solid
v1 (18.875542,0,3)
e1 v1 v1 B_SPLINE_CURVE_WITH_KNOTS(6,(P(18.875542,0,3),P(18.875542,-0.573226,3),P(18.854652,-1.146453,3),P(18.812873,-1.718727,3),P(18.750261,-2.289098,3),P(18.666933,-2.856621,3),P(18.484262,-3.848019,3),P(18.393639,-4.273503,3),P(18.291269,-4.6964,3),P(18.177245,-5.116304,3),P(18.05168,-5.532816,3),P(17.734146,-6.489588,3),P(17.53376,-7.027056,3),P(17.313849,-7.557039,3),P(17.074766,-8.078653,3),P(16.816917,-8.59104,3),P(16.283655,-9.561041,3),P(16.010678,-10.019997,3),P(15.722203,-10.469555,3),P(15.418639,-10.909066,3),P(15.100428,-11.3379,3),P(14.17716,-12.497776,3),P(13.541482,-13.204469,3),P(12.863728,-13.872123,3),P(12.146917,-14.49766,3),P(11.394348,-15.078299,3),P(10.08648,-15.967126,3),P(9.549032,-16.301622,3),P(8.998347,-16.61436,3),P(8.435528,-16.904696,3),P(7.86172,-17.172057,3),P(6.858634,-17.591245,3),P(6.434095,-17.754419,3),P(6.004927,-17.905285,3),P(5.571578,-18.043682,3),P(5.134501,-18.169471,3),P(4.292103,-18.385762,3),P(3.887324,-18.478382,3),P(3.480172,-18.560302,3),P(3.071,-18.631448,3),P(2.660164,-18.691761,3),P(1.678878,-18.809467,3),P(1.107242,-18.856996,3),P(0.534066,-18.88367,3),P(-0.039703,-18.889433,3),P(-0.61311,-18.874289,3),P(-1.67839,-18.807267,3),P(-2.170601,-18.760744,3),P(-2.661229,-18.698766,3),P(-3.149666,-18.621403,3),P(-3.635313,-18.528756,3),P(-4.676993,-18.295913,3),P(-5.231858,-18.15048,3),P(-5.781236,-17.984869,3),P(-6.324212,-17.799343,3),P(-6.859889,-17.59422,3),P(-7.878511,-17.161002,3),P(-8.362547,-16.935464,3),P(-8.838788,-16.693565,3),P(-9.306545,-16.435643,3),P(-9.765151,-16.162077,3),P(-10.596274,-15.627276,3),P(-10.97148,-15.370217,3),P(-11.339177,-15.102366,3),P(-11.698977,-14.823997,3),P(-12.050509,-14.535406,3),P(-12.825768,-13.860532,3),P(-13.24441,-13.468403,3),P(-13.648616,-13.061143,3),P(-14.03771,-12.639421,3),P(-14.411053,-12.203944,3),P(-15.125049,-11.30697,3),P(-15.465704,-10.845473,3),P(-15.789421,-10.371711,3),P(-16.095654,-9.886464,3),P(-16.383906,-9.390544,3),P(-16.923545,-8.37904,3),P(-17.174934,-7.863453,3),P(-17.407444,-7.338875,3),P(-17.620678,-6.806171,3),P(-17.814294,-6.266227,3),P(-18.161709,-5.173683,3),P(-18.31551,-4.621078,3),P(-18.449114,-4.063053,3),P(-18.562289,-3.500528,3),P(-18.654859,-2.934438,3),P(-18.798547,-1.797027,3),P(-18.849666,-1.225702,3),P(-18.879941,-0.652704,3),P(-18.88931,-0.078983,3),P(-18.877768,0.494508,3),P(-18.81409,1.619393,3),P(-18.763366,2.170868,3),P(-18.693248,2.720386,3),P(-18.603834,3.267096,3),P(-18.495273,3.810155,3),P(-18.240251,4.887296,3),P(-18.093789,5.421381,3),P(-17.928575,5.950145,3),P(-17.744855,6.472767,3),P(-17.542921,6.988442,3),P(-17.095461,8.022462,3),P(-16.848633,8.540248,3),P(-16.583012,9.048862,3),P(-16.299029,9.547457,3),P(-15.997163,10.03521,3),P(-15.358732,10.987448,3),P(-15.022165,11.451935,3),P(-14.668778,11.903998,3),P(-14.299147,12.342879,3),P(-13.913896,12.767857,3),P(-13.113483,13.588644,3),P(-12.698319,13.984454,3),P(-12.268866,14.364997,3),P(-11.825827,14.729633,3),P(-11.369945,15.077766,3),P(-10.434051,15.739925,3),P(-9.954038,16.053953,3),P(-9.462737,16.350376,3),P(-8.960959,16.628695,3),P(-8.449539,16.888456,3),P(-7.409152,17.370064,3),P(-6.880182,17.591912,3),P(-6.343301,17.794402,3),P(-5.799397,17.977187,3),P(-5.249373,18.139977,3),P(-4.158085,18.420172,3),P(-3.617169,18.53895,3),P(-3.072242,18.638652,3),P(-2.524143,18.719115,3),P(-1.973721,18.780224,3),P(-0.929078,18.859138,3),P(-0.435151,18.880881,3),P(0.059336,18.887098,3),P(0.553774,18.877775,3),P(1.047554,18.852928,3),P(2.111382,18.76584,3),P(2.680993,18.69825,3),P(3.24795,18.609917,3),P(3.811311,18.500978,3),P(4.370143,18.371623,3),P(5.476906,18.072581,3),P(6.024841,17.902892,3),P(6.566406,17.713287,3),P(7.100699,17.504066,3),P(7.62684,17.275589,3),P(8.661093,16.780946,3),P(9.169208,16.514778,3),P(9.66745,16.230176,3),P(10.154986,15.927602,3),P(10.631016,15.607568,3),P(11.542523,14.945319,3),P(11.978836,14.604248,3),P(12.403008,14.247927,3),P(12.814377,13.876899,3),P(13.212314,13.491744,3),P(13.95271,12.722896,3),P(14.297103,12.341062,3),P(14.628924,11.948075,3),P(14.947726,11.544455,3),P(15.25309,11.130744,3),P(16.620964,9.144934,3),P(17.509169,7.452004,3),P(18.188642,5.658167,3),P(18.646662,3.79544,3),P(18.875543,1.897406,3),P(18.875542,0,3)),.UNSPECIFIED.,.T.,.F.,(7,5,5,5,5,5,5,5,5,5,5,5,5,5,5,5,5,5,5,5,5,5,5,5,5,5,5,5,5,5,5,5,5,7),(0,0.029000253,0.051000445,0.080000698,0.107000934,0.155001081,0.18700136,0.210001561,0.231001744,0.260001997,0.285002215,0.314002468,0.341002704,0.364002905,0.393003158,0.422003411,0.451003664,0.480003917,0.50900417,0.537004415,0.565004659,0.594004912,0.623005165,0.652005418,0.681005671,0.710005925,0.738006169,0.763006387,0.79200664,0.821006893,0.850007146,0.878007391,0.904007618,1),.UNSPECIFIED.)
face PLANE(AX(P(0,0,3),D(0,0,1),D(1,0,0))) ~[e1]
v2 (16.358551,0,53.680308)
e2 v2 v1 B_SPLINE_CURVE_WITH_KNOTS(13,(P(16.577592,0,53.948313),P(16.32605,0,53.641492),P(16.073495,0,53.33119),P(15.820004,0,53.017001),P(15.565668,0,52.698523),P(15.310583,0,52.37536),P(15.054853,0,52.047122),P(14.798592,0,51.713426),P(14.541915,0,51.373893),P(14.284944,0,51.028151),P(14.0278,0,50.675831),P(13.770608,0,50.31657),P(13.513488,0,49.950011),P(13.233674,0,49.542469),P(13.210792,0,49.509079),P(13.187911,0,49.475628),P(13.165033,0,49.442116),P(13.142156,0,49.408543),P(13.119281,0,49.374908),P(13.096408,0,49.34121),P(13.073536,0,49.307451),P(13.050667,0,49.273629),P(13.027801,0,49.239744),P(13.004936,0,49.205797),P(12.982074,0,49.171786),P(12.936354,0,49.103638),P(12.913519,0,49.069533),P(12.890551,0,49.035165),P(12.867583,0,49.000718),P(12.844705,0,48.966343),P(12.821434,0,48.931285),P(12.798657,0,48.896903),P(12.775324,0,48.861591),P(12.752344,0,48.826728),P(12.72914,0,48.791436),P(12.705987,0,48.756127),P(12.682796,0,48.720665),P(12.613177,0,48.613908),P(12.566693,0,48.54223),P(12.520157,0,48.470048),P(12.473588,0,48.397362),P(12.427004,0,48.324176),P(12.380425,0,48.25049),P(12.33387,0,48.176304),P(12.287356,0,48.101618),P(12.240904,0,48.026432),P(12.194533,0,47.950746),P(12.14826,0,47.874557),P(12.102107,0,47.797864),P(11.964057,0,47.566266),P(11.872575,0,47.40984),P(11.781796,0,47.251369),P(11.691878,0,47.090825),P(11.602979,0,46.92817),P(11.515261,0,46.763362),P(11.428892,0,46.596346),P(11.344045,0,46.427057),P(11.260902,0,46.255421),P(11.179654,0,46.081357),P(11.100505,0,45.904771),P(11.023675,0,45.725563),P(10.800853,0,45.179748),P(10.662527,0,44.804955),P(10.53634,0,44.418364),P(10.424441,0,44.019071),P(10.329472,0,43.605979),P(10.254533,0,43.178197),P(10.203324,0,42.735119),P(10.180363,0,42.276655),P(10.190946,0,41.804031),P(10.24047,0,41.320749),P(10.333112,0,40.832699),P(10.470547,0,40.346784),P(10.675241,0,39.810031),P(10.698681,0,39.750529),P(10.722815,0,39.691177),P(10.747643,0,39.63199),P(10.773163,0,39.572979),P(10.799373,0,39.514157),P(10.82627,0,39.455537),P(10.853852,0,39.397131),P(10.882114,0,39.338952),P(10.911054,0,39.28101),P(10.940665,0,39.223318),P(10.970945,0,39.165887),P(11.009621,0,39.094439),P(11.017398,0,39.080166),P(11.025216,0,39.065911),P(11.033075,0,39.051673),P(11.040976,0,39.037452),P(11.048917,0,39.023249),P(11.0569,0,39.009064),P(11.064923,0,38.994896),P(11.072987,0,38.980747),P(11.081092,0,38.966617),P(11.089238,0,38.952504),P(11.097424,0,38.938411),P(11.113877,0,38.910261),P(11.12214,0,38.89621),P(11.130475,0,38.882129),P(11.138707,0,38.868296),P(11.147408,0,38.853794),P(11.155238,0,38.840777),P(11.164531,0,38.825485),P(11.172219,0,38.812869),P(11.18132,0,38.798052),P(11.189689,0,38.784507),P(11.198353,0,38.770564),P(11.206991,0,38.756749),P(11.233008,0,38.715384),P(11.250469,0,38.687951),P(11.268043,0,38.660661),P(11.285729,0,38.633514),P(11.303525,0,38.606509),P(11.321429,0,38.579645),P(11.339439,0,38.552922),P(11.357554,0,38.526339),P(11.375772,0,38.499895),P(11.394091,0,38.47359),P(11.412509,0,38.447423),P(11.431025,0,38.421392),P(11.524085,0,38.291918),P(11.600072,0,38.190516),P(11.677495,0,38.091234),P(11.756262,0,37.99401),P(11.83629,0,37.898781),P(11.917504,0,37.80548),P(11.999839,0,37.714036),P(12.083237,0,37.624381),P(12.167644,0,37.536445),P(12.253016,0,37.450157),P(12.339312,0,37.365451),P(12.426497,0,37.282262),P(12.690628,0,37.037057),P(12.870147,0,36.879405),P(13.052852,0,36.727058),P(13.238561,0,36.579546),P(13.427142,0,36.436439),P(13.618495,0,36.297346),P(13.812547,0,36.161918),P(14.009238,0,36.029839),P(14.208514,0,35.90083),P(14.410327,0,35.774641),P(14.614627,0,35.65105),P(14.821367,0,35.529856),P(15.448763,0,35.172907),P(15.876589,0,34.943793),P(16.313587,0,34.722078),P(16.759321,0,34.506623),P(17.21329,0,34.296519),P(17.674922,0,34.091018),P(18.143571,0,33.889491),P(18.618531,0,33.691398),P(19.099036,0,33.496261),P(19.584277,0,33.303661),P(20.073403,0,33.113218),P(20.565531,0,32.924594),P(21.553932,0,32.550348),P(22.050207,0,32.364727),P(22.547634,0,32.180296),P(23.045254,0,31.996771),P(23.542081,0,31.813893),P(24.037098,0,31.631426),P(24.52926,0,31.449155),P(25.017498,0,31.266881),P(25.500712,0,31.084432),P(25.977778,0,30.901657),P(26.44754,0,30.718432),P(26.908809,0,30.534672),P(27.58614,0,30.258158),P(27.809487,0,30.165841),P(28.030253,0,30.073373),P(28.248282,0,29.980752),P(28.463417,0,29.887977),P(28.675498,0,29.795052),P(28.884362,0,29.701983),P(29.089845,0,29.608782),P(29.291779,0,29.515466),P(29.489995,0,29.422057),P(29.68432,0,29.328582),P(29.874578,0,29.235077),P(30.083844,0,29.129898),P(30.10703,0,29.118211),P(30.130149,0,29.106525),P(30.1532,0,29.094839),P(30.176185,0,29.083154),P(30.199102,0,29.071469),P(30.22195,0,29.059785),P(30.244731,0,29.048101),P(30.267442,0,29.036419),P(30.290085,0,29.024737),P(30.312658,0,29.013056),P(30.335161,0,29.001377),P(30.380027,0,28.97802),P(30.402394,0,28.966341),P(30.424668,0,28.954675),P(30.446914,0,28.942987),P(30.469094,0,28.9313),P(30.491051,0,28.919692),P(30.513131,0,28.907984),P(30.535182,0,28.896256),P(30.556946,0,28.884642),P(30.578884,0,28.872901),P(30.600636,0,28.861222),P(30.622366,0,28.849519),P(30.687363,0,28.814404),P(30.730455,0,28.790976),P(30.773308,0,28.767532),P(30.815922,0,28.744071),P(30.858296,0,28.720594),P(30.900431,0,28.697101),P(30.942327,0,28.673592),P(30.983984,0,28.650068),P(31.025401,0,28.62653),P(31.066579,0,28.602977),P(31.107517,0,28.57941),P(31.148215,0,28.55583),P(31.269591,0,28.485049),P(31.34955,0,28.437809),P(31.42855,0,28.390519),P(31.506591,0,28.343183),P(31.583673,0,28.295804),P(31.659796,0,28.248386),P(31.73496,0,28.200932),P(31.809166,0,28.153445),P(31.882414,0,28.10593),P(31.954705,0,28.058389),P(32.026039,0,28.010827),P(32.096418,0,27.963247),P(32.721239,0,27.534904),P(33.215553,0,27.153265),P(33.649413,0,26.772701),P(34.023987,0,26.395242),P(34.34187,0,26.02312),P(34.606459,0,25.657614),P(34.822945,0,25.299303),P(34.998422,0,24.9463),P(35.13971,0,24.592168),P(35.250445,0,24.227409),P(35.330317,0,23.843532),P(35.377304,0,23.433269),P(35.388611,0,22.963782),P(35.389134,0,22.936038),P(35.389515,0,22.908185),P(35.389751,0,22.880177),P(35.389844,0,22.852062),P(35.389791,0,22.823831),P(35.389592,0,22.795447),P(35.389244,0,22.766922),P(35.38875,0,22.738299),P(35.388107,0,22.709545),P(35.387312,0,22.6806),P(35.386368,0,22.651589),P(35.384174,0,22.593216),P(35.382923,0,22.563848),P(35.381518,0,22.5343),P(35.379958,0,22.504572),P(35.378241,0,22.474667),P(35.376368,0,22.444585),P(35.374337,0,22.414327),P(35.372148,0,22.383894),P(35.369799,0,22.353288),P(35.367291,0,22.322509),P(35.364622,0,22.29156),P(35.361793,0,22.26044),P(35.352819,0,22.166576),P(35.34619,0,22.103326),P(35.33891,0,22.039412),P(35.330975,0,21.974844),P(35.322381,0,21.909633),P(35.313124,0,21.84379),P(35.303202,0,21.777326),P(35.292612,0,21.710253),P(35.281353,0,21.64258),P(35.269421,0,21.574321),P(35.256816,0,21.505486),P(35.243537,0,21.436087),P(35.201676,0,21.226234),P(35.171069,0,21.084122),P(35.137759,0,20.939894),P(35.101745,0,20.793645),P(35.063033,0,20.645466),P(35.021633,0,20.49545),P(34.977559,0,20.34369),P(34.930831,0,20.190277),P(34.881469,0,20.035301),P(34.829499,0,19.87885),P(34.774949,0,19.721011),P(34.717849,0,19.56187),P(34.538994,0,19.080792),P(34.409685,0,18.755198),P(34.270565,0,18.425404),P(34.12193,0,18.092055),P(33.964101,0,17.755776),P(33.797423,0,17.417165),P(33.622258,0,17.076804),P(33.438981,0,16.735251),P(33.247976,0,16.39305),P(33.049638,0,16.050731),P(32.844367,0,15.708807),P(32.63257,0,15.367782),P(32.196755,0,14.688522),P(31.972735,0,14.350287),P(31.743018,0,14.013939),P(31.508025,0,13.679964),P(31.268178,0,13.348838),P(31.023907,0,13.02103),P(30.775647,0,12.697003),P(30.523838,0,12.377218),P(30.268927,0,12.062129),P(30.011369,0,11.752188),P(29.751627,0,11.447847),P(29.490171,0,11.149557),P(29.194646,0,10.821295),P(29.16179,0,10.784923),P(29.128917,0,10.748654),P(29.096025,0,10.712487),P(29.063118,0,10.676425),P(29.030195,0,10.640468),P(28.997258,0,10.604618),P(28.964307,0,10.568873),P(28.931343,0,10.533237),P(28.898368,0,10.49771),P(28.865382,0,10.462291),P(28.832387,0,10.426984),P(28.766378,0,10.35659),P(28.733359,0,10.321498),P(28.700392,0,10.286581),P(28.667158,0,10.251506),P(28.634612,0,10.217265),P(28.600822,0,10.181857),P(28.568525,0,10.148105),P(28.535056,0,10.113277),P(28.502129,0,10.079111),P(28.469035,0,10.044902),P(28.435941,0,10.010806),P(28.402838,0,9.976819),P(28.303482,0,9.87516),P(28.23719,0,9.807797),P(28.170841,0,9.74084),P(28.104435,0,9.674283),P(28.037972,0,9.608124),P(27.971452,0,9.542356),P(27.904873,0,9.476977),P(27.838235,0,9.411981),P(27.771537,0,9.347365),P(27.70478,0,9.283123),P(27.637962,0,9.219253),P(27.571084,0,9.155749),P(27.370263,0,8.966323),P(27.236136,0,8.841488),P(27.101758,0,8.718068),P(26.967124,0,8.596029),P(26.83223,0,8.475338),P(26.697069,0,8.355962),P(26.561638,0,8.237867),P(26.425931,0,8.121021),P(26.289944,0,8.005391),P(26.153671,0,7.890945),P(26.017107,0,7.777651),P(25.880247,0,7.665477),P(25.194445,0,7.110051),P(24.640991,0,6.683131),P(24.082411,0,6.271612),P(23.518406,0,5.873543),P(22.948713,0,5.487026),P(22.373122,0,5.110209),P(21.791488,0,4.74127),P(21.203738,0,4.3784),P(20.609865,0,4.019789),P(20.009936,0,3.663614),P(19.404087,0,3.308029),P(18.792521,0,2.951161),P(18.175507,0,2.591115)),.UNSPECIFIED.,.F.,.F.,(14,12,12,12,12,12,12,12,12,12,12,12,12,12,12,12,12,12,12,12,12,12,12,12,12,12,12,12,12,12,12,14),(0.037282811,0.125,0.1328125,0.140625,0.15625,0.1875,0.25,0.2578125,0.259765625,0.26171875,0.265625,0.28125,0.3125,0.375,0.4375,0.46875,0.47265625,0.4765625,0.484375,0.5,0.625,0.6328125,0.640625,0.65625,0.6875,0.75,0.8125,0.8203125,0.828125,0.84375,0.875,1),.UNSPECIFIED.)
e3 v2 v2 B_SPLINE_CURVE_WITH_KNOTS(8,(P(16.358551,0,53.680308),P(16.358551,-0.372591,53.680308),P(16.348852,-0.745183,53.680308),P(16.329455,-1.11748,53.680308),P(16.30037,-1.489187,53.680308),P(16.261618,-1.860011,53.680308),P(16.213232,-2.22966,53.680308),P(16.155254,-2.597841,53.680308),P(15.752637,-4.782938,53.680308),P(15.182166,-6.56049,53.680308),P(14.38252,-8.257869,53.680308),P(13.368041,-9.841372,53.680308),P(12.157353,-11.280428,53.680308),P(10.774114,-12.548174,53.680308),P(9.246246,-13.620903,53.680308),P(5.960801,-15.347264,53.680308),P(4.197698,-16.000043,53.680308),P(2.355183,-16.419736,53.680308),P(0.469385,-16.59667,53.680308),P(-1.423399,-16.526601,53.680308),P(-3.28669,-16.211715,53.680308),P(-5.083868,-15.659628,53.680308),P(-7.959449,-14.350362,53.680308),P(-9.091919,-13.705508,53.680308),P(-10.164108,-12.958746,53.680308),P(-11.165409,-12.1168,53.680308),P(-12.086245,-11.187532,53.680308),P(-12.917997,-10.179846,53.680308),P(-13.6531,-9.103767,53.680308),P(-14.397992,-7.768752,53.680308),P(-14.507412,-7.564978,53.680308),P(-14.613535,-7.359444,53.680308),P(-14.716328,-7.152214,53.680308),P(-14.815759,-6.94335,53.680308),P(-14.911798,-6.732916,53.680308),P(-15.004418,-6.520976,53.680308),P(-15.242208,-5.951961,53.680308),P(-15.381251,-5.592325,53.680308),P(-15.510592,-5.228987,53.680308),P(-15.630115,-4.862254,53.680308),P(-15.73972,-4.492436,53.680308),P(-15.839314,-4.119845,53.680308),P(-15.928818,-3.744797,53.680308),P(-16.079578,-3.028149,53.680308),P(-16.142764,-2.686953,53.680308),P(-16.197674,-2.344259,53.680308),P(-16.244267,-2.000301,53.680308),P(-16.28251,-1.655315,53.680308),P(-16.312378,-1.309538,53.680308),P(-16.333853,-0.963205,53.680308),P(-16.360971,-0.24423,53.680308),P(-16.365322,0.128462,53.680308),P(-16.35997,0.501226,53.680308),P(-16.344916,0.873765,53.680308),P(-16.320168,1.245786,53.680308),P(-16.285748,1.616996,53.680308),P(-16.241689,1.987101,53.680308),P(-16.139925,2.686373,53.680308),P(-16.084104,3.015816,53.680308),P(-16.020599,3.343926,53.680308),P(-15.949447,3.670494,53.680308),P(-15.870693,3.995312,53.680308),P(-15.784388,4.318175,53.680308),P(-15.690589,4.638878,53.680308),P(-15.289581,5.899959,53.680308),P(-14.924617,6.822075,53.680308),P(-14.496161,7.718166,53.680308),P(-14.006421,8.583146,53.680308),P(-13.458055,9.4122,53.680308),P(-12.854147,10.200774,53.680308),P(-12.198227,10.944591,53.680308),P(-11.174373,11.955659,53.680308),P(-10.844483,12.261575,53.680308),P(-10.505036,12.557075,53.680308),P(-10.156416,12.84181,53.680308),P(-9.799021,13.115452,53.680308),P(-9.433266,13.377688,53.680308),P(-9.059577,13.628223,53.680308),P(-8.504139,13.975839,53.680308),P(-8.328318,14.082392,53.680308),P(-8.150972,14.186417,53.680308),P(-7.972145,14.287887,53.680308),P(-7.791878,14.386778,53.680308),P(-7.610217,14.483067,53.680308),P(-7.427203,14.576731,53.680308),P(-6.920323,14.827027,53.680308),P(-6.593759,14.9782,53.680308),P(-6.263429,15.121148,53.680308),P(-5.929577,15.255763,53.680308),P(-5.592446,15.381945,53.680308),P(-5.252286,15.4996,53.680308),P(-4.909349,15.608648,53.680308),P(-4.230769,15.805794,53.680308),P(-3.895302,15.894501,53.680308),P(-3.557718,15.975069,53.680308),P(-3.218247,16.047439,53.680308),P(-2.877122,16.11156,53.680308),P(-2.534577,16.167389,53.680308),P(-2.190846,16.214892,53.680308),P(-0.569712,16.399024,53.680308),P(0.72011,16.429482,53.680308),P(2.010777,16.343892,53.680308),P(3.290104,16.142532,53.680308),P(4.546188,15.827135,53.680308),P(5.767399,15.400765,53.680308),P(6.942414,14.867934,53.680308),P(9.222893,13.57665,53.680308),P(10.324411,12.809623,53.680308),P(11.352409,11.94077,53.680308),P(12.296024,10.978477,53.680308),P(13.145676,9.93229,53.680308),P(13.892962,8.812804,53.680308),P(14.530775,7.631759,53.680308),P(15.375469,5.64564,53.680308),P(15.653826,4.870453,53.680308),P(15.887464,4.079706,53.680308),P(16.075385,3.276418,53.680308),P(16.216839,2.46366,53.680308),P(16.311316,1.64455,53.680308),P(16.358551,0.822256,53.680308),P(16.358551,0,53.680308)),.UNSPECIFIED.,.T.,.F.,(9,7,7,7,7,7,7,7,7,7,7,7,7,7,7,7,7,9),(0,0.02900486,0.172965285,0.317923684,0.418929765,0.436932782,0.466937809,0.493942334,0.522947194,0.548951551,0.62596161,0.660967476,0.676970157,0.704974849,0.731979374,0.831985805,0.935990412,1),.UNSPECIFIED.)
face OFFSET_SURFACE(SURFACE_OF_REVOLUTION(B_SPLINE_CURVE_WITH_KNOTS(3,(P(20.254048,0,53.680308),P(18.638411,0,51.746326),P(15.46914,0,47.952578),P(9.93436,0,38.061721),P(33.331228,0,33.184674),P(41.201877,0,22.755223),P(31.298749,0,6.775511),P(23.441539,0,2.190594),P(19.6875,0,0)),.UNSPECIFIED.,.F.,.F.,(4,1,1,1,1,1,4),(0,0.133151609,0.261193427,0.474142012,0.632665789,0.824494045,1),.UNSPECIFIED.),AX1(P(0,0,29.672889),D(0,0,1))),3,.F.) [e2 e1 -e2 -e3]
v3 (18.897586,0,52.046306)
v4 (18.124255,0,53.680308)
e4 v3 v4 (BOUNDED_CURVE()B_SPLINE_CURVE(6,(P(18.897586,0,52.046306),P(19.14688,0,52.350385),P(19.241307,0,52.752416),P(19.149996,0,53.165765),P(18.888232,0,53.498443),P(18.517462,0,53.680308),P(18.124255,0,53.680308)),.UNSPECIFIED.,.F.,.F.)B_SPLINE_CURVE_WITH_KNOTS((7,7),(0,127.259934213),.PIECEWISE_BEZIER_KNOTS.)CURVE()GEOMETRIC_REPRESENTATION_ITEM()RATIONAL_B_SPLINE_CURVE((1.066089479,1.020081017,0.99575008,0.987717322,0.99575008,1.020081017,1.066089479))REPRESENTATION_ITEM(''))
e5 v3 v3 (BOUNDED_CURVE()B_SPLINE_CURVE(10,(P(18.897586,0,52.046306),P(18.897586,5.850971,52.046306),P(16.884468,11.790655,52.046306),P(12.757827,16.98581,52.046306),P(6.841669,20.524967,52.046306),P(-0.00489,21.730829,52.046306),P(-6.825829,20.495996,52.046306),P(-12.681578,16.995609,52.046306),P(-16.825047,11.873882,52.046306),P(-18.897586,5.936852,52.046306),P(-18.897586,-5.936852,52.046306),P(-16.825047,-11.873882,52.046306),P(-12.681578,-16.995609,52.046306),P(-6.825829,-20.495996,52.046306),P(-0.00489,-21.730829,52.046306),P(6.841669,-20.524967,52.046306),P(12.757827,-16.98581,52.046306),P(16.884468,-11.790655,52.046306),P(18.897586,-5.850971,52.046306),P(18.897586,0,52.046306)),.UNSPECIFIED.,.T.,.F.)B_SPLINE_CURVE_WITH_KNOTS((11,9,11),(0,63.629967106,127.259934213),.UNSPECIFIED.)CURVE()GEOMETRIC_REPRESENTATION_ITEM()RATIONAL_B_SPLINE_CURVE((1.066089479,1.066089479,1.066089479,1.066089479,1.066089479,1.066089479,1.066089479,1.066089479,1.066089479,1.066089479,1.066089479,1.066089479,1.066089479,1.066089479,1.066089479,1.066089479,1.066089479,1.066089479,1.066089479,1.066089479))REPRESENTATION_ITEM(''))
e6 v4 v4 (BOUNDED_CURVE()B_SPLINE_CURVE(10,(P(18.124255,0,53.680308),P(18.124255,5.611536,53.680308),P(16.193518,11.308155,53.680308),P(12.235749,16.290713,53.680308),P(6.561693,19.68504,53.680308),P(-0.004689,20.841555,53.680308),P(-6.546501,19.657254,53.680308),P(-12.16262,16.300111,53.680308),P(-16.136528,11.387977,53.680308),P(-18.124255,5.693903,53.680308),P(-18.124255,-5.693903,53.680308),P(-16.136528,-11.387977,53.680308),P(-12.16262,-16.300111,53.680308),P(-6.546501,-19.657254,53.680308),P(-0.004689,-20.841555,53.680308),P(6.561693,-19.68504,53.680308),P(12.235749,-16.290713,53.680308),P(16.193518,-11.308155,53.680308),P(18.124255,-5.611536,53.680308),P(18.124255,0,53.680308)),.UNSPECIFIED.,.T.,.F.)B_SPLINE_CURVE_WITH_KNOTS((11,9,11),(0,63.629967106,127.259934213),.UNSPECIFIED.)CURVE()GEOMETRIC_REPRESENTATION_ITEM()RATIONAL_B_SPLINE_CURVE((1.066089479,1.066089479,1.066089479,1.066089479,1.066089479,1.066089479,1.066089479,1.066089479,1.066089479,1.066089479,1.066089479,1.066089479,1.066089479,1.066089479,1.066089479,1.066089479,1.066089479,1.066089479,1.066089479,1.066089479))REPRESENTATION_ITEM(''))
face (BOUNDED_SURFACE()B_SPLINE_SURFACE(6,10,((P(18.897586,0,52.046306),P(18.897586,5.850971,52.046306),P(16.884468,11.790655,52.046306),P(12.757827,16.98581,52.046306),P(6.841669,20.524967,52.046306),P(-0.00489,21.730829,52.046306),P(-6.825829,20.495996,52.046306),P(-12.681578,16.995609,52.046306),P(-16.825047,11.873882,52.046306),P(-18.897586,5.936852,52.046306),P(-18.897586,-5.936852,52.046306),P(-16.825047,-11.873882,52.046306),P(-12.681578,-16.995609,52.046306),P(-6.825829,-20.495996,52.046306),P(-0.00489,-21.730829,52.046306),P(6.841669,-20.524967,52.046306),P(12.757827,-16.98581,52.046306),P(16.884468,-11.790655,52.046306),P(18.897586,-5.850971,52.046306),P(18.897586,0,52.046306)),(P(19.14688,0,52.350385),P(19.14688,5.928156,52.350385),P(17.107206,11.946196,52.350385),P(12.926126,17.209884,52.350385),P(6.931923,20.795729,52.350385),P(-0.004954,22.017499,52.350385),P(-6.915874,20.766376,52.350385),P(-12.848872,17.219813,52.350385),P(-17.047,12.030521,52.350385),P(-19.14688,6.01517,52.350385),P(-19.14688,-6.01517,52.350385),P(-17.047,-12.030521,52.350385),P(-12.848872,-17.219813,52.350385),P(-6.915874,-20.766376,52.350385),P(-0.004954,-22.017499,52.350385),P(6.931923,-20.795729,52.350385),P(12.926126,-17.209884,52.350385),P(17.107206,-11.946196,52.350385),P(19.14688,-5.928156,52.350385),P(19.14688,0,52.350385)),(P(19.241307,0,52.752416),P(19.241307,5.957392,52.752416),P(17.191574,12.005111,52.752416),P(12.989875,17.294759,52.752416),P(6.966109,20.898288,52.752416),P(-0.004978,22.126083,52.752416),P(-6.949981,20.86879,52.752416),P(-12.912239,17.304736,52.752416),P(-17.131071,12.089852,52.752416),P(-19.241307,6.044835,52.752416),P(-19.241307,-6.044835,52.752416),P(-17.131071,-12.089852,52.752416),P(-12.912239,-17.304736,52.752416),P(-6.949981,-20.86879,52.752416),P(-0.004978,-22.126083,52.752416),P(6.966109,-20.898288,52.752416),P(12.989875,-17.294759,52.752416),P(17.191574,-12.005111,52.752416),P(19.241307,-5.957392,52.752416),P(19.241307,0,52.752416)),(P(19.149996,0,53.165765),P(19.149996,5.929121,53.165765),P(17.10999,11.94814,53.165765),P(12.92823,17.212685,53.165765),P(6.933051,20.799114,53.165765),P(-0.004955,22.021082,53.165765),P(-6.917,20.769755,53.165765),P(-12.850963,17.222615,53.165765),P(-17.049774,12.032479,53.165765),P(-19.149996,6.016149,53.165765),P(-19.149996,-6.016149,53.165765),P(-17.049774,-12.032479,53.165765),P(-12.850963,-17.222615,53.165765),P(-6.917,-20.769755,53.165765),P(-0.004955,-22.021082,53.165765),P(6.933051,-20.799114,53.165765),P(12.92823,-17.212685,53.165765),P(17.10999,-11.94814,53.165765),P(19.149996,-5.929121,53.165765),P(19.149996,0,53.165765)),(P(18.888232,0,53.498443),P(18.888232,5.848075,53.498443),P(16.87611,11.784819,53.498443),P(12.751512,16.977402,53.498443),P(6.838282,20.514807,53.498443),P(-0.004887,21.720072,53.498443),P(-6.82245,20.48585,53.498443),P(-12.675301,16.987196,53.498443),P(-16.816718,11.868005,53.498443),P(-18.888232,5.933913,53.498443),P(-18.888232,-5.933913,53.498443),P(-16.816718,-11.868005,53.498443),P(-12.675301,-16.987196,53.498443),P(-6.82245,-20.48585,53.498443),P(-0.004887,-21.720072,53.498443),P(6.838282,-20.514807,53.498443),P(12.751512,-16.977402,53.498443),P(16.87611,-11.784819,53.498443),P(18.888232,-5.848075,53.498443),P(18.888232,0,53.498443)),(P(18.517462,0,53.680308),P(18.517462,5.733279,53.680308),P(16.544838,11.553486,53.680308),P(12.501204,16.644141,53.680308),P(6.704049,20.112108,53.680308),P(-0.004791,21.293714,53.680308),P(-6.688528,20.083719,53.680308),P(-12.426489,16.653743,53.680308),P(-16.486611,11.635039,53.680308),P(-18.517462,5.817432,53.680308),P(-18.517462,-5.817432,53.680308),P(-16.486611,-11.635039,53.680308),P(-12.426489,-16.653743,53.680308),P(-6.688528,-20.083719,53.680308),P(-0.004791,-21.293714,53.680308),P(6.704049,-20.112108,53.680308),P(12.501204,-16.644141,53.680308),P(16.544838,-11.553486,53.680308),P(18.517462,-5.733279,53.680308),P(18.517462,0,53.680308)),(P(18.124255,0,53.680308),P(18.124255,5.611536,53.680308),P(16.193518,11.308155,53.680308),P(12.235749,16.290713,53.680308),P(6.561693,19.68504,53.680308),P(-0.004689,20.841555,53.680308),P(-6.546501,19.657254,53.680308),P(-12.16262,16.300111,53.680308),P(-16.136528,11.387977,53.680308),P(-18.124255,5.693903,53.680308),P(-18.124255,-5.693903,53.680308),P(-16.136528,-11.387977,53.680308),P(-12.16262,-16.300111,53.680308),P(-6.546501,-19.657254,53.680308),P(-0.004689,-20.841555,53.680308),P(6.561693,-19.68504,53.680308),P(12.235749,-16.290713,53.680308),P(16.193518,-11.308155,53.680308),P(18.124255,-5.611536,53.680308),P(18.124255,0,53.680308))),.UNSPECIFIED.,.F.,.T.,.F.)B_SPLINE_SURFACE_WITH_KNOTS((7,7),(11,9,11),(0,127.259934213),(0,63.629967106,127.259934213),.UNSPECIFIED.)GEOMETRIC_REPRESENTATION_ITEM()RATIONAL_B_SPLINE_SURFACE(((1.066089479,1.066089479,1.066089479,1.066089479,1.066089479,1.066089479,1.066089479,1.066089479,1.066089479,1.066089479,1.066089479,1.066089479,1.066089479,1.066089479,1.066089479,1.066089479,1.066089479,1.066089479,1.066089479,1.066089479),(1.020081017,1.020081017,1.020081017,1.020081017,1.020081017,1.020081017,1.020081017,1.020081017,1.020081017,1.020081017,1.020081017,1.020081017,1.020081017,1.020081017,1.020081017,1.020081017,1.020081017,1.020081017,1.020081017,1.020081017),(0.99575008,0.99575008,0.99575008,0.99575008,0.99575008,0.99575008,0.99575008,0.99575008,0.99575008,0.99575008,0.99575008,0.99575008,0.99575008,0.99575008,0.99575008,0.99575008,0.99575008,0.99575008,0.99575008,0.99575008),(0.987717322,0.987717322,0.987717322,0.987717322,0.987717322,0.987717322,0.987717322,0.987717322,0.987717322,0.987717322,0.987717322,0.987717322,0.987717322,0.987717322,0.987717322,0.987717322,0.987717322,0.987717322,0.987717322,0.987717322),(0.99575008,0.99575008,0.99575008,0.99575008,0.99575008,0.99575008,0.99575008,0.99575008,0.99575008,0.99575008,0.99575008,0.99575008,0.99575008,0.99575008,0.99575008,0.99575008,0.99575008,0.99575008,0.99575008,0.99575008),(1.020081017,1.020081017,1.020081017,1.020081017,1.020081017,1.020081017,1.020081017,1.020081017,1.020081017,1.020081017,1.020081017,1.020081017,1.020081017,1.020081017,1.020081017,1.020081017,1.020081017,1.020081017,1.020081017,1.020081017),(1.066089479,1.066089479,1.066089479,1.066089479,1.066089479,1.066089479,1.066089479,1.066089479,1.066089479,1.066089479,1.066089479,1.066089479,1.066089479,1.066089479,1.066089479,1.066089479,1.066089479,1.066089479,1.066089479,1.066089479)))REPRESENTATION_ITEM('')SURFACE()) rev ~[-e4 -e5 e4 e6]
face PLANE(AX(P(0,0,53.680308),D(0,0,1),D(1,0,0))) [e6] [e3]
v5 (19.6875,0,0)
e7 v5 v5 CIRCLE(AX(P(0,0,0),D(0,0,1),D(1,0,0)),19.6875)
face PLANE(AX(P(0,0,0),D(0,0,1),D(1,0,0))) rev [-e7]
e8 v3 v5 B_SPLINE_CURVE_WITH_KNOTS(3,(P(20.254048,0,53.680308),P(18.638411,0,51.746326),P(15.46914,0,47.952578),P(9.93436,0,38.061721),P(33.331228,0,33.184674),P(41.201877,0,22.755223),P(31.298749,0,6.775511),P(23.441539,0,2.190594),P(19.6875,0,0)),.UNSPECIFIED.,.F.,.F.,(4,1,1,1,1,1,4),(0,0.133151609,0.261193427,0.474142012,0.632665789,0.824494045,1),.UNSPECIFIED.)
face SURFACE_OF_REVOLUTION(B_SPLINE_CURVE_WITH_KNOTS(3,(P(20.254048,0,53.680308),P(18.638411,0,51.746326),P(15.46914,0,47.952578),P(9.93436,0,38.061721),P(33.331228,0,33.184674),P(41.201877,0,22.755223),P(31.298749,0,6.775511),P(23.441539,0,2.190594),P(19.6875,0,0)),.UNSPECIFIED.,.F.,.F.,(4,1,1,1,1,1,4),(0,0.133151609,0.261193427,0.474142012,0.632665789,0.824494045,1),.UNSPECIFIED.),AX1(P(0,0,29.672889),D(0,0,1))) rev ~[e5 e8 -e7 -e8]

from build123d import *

# Parameters (mm, degrees)
F2_R = 1
F3_T = 3


# Not quite as in the source:
# - a shell that OpenCascade refuses in one call is made with other operations: the cavity is built on its own and cut out


with BuildPart() as f1:
    # F0 (on Front) → F1 (revolve)
    with BuildSketch(Plane.XZ):
        with BuildLine():
            Line((0, 53.6803081632), (0, 0))
            Line((0, 0), (19.687499851, 0))
            add(Edge.make_bspline(
                [(20.2540475875, 53.6803081632), (18.6384112126, 51.7463255353), (15.4691397035, 47.9525782934), (9.9343595071, 38.0617206442), (33.3312284292, 33.1846739682), (41.201877378, 22.7552228995), (31.298748703, 6.7755111019), (23.4415391534, 2.19059425), (19.687499851, 0)],
                knots=[0, 0, 0, 0, 0.1331516095, 0.2611934274, 0.4741420117, 0.632665789, 0.824494045, 1, 1, 1, 1], degree=3))
            Line((20.2540475875, 53.6803081632), (0, 53.6803081632))
        make_face()
    revolve(axis=Axis((0, 0, 29.6728890389), (0, 0, 1)))

    # F2
    f2_edges = [f1.edges().sort_by_distance(p)[0] for p in [
        (-20.254048, 0, 53.680308),
    ]]
    fillet(f2_edges, radius=F2_R)

    # F3: shell of thickness 3, made by hand


with BuildPart() as f3_core1:
    # F3_t2: copy of F1
    add(f1.part)

    # the walls: a layer under each face that stays
    f3_faces = [f3_core1.faces().sort_by_distance(p)[0] for p in [
        (-35.0774831473, 0, 29.4661465552),
        (-19.0281361236, 0, 53.1080918413),
        (0, 0, 0),
    ]]
    thicken(f3_faces, amount=-F3_T, mode=Mode.SUBTRACT)


with BuildPart() as f1_1:
    add(f1.part)

    # what is left inside the walls is the cavity
    f3_cavity = [f3_core1.part.solids().sort_by_distance(p)[0] for p in [
        (-19.363052, 0, 33.363934),
    ]]
    add(f3_cavity, mode=Mode.SUBTRACT)


solid = f1_1.part
